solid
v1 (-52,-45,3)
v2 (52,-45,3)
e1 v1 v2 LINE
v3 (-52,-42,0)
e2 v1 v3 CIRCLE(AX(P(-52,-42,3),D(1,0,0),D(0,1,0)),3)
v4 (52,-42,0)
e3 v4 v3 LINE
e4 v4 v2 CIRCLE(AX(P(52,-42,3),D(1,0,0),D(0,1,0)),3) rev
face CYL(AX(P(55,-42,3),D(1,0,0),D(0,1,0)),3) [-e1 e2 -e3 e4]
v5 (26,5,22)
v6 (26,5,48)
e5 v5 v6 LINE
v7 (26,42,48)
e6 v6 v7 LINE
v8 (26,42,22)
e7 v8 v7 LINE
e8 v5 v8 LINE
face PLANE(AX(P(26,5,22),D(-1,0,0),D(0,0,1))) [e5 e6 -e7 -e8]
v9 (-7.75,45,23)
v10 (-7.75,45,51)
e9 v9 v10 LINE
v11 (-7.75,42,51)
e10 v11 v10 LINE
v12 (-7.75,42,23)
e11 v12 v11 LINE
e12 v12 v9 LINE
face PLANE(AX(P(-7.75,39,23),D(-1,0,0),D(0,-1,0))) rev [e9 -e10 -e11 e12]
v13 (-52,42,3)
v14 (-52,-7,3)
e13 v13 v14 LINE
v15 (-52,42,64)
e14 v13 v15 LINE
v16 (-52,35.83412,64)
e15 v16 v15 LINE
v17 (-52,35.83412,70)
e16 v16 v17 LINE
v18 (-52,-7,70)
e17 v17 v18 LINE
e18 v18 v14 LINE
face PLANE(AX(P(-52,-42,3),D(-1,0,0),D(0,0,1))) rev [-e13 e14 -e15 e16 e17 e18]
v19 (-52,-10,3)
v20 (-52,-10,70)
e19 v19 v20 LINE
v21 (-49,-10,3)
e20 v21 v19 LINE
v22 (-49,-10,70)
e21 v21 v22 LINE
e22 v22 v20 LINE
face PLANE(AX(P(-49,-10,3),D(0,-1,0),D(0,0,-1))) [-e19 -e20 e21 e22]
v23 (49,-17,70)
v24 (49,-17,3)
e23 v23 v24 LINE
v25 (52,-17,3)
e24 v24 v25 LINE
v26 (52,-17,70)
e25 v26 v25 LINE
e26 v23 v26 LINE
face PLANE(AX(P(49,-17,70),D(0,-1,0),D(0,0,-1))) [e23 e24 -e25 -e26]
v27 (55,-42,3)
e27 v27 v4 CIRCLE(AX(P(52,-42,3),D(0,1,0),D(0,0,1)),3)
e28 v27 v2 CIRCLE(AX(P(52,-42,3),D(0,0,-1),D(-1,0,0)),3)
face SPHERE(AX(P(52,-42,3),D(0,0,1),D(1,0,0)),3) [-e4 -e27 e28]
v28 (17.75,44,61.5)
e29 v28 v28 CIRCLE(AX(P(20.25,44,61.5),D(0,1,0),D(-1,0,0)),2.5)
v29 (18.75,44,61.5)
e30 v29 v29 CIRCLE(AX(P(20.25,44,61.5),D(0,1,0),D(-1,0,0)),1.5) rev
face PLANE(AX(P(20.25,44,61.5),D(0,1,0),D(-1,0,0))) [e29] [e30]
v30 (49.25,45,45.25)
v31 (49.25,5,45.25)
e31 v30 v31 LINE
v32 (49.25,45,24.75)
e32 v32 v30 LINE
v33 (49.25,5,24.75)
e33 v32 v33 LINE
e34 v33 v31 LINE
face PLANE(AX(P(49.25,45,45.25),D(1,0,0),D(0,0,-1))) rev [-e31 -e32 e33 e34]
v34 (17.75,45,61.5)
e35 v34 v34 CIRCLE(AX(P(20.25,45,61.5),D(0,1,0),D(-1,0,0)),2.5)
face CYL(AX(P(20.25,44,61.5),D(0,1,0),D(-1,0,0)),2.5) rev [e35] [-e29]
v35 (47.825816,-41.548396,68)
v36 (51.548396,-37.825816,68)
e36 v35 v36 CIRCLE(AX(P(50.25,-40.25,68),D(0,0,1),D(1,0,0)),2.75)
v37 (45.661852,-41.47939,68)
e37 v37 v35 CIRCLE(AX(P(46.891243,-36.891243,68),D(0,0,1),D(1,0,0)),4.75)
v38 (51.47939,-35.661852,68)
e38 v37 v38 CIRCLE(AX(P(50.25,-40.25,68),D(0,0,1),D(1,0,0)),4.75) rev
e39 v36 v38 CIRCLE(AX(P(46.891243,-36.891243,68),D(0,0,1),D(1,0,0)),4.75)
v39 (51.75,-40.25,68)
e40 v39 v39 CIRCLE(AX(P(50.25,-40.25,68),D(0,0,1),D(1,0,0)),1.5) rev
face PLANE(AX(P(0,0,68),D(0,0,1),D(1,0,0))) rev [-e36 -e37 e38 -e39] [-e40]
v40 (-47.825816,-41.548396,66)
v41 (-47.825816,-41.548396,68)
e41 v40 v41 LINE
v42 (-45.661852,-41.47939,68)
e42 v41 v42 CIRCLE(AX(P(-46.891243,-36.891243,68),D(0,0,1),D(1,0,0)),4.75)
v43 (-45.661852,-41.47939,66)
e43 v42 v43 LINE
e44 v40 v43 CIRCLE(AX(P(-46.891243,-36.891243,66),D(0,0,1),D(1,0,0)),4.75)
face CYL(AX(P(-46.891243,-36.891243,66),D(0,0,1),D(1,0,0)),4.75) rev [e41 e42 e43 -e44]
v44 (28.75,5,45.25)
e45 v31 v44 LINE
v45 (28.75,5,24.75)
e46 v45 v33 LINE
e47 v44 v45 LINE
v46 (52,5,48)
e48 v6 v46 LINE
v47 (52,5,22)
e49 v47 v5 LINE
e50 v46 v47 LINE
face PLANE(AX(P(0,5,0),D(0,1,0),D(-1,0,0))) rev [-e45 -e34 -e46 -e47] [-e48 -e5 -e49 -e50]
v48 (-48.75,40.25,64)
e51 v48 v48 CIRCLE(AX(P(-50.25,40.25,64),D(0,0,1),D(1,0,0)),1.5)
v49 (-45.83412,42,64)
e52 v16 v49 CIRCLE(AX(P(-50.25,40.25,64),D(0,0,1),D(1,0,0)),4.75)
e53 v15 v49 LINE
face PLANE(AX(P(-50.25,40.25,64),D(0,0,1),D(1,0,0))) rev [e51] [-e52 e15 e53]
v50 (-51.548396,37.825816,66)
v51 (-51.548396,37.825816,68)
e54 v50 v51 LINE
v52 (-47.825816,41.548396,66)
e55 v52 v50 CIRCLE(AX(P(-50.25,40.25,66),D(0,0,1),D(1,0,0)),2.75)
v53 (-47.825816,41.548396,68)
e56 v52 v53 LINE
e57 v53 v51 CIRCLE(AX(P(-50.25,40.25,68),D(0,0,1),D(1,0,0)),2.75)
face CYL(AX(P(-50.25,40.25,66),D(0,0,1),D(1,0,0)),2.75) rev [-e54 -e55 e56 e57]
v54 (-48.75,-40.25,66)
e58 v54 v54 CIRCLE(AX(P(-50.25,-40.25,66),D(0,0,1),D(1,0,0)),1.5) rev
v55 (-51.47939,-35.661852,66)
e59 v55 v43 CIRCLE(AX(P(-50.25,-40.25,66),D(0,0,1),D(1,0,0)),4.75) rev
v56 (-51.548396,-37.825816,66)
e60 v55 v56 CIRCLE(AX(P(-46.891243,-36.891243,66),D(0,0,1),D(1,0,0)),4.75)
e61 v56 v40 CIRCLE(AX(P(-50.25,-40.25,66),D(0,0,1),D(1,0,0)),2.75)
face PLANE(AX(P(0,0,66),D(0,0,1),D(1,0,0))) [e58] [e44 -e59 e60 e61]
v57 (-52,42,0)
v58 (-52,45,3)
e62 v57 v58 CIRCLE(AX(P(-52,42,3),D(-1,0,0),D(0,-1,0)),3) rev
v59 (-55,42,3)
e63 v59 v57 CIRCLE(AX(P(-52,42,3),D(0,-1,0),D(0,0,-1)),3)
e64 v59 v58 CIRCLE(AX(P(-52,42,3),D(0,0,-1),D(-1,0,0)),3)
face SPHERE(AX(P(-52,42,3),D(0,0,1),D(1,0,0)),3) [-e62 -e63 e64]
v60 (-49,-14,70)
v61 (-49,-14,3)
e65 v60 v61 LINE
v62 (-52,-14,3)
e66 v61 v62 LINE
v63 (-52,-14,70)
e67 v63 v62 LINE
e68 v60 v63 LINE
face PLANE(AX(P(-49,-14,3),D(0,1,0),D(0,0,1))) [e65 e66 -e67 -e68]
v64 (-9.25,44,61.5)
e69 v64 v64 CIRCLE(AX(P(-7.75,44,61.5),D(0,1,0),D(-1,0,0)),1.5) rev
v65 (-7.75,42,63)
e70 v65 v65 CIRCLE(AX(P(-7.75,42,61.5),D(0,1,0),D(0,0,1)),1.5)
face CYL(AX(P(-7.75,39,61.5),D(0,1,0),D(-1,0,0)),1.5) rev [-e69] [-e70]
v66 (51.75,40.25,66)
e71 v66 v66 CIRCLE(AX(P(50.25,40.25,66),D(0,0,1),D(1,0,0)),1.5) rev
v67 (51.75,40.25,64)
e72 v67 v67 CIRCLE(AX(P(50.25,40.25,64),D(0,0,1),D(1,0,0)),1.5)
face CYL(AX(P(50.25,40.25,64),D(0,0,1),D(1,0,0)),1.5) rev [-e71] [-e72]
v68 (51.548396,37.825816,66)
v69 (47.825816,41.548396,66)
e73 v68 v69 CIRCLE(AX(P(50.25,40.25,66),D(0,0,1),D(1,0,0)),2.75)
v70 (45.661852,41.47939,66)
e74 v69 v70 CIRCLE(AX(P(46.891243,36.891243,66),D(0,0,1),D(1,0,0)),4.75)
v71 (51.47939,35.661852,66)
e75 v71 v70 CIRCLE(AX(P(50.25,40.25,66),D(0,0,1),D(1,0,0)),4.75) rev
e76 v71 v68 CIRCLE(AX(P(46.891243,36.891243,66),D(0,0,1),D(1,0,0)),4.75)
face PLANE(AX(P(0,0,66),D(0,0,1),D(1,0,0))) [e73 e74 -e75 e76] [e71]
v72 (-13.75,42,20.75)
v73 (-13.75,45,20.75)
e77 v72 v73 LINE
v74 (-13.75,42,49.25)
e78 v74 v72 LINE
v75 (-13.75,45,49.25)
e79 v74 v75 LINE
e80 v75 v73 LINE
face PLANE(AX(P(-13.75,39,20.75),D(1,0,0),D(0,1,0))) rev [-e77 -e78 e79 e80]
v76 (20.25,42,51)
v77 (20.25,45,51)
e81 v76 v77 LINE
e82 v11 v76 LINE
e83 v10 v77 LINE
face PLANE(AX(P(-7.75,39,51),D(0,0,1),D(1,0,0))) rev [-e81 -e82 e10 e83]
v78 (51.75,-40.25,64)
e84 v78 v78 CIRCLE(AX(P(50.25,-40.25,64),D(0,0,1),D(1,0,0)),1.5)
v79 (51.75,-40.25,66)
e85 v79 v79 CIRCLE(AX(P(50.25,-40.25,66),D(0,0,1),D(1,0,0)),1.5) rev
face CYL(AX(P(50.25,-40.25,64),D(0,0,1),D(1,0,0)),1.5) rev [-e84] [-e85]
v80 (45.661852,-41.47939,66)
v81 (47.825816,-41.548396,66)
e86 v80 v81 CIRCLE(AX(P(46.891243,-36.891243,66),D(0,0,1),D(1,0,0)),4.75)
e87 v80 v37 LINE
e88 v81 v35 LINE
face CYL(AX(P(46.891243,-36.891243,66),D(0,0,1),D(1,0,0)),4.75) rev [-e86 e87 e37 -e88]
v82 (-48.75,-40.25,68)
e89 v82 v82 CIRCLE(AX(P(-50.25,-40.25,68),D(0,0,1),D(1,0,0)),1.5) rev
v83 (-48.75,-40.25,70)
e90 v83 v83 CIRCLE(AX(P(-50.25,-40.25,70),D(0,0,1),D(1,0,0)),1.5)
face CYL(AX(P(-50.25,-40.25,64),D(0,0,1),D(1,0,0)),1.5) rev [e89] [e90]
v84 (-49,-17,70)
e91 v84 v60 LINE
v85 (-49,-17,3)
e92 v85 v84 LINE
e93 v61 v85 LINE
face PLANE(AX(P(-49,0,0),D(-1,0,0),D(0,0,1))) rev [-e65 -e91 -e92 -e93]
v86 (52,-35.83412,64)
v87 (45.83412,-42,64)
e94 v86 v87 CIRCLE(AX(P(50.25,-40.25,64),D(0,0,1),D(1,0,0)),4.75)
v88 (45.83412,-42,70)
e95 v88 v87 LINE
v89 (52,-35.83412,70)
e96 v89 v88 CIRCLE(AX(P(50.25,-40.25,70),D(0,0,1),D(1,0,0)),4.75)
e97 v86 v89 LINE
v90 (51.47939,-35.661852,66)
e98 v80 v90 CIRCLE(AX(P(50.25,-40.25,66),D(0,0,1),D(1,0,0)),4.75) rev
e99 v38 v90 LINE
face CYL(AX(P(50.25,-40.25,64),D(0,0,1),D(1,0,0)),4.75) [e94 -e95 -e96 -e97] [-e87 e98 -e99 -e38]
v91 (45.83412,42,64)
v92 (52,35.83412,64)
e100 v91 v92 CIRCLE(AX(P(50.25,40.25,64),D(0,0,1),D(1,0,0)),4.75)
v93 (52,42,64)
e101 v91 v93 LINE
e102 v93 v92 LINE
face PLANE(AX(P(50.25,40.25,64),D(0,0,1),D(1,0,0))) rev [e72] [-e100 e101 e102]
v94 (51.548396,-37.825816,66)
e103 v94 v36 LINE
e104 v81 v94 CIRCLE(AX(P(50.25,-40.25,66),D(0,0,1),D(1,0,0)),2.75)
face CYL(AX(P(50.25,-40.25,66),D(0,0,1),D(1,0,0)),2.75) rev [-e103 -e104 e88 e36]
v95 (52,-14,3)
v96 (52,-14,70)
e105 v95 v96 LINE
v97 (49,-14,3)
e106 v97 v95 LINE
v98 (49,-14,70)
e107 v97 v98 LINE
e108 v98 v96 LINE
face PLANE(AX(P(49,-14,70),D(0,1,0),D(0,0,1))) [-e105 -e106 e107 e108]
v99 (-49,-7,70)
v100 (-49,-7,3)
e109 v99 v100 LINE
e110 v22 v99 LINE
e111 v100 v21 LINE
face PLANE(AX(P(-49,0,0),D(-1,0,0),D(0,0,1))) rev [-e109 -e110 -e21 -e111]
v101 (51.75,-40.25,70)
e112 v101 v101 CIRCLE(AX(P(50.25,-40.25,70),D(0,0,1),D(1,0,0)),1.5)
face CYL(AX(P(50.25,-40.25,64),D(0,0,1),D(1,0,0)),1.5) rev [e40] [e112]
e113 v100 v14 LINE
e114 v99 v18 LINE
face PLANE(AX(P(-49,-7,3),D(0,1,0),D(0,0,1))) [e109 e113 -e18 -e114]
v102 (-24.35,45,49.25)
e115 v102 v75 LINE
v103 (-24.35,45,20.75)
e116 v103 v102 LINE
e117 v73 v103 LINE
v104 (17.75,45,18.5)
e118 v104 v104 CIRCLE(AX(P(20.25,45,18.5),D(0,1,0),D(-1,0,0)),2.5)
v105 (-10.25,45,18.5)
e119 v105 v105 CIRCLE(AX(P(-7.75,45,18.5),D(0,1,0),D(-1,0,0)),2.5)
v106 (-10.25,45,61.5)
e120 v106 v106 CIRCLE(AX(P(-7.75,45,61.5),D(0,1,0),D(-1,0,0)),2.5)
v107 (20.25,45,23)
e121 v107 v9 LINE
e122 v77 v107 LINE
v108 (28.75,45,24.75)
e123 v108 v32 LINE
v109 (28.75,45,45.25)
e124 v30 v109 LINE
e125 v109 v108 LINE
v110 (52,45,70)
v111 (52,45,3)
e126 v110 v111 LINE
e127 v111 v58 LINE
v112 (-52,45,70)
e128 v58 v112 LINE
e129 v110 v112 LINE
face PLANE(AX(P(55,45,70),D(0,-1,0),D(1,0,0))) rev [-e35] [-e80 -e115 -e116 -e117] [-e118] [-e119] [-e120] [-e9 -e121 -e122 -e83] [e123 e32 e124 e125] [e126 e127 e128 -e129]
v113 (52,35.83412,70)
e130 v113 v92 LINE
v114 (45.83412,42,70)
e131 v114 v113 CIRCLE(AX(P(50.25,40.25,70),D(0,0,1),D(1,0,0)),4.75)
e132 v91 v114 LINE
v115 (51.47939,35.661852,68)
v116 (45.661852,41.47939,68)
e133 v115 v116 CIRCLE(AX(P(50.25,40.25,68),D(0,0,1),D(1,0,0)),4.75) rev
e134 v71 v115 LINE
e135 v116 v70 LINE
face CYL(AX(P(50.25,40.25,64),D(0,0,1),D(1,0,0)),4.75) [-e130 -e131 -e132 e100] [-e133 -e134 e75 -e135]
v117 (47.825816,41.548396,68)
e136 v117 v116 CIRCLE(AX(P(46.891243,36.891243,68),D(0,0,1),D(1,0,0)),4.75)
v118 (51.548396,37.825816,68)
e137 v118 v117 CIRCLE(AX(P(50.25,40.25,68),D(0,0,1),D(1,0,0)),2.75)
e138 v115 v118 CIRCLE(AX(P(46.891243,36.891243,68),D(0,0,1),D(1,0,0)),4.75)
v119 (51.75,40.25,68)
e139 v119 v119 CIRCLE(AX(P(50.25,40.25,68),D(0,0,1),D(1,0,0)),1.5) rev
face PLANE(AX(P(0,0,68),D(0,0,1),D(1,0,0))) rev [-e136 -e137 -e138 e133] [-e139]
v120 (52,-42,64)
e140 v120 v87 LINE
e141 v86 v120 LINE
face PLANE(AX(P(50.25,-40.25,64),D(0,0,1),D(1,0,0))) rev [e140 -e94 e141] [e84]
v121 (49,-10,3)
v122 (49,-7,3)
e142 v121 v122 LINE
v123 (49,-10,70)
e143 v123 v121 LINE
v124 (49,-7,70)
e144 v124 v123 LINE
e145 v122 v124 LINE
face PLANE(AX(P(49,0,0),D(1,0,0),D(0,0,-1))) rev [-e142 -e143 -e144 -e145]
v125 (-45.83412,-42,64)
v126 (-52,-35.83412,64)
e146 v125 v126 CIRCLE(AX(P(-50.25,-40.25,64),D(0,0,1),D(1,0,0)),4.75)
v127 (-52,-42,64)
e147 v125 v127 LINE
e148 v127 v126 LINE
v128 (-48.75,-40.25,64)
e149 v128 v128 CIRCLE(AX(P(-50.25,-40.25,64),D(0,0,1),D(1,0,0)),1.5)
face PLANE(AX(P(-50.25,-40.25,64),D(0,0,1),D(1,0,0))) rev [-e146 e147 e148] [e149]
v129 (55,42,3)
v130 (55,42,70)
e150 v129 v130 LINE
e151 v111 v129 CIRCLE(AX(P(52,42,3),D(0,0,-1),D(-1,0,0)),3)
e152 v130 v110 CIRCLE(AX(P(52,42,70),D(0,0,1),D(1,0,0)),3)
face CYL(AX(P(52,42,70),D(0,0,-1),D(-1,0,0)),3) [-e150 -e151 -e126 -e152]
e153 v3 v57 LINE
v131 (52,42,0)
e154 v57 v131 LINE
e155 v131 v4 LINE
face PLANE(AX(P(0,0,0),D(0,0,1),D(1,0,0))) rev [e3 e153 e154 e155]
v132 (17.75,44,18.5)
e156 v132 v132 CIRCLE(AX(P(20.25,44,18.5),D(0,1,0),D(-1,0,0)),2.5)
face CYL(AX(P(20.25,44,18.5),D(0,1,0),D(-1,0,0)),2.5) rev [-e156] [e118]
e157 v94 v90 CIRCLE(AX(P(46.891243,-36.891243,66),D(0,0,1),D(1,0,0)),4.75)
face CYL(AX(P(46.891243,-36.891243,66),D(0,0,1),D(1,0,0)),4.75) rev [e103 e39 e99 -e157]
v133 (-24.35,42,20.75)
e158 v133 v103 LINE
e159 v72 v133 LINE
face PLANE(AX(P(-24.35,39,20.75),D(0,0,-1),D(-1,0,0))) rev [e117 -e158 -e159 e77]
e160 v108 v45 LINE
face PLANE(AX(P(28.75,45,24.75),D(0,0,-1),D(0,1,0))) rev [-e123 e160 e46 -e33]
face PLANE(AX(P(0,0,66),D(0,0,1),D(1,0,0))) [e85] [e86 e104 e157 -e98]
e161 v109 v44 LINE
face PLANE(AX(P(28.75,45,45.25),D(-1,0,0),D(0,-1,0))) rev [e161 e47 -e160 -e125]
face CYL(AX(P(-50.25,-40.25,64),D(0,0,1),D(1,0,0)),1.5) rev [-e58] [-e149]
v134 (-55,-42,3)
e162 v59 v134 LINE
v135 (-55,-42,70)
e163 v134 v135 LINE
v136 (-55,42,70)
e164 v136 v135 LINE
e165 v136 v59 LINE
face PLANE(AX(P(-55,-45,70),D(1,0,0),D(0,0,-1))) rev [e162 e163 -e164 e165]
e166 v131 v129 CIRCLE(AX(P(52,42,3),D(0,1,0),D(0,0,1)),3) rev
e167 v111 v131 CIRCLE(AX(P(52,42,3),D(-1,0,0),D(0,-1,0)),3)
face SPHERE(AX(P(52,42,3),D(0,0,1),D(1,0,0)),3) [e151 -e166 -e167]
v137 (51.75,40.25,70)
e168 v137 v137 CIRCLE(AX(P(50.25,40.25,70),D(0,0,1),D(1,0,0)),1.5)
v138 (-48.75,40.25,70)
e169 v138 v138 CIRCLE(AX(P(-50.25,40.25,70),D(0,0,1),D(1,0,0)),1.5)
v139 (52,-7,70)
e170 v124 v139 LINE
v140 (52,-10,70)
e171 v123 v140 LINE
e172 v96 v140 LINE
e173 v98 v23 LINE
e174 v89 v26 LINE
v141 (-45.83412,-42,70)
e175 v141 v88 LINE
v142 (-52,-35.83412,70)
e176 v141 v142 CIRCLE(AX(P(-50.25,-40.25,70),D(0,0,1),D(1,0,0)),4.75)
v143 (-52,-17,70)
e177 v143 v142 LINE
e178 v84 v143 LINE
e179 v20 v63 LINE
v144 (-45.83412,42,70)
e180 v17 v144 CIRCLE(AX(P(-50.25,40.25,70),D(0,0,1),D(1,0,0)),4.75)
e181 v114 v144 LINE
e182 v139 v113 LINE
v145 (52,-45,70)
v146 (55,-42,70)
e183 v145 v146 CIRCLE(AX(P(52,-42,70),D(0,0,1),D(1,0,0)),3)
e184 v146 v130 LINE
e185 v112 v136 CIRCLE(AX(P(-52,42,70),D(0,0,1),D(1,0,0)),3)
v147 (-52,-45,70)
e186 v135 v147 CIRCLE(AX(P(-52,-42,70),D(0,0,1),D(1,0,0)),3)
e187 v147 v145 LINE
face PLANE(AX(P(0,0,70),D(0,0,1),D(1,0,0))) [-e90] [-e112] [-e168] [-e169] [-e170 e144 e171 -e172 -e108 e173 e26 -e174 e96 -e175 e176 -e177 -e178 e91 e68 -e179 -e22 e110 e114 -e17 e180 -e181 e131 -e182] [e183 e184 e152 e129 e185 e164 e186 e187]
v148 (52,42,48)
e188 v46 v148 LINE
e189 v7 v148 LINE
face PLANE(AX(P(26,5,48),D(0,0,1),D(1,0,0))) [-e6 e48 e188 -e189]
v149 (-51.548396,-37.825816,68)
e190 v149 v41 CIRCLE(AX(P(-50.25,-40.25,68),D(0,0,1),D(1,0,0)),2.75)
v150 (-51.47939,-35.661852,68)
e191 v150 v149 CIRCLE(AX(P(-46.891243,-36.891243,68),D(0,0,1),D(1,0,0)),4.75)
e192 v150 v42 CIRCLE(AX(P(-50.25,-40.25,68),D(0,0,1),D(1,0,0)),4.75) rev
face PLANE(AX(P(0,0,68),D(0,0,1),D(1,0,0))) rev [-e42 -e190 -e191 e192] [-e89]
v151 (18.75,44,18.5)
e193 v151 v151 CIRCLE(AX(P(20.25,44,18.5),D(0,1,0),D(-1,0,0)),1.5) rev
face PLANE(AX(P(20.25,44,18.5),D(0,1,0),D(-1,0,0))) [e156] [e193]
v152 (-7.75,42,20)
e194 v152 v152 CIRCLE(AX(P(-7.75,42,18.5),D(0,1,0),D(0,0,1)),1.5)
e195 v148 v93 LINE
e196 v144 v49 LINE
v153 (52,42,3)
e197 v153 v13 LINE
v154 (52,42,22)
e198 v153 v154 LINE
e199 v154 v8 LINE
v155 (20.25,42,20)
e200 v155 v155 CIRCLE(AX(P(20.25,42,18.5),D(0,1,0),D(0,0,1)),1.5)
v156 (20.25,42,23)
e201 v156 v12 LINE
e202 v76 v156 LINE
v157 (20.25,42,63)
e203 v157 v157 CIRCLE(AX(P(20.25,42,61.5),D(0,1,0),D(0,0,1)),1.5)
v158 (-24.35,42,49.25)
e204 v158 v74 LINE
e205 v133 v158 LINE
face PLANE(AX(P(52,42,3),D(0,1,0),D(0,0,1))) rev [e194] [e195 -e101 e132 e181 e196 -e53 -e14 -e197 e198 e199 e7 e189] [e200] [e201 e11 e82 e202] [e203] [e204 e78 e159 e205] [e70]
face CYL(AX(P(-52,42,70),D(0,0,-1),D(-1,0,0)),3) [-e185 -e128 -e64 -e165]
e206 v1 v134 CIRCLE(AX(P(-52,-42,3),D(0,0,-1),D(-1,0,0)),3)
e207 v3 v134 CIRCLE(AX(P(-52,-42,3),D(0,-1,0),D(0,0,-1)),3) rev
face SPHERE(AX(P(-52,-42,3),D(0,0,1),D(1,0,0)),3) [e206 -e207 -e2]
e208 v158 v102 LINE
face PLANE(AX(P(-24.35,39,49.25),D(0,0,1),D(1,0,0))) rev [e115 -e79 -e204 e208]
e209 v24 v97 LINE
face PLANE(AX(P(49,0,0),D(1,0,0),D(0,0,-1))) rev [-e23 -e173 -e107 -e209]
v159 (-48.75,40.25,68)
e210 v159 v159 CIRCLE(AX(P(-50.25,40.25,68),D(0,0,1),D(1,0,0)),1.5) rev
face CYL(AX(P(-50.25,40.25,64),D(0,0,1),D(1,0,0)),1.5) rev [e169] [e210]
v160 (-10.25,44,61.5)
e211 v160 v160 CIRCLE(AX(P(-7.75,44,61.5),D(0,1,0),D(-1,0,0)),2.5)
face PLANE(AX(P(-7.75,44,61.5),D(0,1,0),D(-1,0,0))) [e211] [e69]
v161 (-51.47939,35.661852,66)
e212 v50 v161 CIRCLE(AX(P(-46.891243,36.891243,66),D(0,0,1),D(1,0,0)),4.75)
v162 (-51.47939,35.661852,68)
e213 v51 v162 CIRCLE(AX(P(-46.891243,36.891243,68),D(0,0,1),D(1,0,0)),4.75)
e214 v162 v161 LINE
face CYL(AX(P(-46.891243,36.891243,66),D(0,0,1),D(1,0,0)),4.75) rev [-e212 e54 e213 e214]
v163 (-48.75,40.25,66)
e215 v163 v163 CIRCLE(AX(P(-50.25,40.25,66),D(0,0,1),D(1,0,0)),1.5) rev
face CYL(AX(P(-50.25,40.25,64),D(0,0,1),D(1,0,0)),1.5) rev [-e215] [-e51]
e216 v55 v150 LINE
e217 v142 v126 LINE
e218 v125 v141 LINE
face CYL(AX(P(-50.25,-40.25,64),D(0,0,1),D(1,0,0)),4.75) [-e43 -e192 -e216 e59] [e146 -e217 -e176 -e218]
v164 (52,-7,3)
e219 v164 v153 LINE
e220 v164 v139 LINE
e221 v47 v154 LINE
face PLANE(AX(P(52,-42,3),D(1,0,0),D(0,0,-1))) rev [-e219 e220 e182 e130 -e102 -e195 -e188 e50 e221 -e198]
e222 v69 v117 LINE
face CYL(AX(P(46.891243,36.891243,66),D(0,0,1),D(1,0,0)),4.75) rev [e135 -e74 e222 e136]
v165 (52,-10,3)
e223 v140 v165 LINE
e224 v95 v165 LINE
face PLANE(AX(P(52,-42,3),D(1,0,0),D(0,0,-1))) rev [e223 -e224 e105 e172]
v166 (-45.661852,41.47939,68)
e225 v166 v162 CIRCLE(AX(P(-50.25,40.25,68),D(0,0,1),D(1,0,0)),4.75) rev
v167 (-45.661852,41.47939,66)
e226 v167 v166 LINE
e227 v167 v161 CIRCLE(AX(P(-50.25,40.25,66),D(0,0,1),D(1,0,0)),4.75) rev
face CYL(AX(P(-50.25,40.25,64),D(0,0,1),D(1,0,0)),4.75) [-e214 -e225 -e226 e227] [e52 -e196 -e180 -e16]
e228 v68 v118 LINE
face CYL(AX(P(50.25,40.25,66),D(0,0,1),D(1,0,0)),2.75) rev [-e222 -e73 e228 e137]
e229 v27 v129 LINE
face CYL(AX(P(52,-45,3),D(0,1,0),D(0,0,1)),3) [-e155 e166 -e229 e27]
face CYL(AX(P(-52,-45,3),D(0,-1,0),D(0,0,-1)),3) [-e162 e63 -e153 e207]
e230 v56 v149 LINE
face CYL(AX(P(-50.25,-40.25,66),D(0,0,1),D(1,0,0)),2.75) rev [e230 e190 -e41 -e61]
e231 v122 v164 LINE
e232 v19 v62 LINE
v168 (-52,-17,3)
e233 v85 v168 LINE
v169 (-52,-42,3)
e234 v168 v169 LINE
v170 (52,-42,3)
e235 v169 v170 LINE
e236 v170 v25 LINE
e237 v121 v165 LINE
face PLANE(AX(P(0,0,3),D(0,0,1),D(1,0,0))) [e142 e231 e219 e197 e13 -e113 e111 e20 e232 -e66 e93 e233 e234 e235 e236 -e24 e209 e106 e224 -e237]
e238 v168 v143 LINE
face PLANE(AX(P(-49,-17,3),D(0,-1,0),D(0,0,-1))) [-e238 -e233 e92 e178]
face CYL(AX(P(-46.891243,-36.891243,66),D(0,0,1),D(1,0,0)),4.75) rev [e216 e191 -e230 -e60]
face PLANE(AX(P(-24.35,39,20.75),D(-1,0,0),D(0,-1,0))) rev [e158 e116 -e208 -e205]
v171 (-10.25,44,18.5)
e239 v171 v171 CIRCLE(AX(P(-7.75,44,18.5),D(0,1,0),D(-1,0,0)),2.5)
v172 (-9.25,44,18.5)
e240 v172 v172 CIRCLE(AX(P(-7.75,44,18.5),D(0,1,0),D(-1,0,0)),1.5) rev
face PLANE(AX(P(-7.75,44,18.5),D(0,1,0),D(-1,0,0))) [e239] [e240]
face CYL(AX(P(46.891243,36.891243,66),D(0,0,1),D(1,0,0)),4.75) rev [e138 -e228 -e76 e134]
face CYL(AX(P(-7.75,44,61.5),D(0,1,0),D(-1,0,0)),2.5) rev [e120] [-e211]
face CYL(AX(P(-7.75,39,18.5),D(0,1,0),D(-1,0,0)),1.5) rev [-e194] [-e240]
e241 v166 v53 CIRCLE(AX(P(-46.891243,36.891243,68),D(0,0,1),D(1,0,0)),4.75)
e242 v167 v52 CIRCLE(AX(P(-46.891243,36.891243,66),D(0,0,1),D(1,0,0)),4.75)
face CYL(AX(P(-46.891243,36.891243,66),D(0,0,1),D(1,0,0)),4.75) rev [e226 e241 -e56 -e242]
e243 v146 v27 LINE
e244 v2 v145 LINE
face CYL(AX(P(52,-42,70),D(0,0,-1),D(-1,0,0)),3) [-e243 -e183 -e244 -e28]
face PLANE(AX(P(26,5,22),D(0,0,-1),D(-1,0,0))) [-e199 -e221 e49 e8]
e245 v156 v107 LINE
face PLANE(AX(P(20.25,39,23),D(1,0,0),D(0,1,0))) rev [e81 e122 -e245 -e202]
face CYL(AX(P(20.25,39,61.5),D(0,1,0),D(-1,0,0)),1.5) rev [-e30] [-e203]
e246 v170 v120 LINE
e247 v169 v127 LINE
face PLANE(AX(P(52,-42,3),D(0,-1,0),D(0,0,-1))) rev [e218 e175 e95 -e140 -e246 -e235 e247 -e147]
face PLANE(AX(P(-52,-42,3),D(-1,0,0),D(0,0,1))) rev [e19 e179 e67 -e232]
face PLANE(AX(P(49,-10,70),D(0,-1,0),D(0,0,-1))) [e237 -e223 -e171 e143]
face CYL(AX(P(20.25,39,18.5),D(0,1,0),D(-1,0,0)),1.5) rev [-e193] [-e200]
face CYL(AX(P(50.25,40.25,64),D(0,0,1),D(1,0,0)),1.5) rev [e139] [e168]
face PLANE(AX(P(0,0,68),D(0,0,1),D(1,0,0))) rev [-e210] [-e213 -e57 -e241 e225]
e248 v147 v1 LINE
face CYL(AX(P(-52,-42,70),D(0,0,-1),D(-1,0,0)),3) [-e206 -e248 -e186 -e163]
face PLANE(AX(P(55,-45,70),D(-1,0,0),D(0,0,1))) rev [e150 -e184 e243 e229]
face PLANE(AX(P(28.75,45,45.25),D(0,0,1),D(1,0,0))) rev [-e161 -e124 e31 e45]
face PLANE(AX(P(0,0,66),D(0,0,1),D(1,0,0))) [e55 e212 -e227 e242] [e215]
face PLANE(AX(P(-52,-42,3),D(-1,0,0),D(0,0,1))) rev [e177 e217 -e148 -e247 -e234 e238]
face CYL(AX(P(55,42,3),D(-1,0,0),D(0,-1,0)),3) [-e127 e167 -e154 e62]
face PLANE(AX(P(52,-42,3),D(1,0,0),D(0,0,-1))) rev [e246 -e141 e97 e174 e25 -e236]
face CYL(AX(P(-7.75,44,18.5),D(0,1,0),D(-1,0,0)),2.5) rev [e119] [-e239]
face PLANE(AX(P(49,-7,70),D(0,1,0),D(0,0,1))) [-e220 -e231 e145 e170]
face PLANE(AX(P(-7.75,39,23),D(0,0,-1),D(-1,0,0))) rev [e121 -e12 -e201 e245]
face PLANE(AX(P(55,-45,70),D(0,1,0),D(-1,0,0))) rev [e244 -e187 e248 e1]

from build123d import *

# Parameters (mm, degrees)
SKETCH2_W           = 110
SKETCH2_H           = 90
BOSS_EXTRUDE1_DEPTH = 70
SKETCH4_W           = 104
SKETCH4_H           = 84
CUT_EXTRUDE1_DEPTH  = 67
FILLET6_R           = 3
FILLET7_R           = 3
FILLET8_R           = 3
FILLET9_R           = 3
FILLET10_R          = 3
SKETCH5_W           = 26
SKETCH5_H           = 26
BOSS_EXTRUDE2_DEPTH = 40
SKETCH7_W           = 20.5
SKETCH7_H           = 20.5
CUT_EXTRUDE2_DEPTH  = 40
SKETCH9_W           = 67
SKETCH9_H           = 3
BOSS_EXTRUDE3_DEPTH = 6
SKETCH10_W          = 67
SKETCH10_H          = 3
BOSS_EXTRUDE4_DEPTH = 6
SKETCH12_R          = 1.5
SKETCH12_W          = 28
SKETCH12_H          = 28
CUT_EXTRUDE4_DEPTH  = 6
SKETCH13_W          = 10.6
SKETCH13_H          = 28.5
CUT_EXTRUDE5_DEPTH  = 6
SKETCH14_R          = 4.75
SKETCH14_R_2        = 1.5
BOSS_EXTRUDE7_DEPTH = 6
CUT_EXTRUDE6_START  = -2
SKETCH16_R          = 4.75
SKETCH16_R_2        = 2.75
SKETCH16_R_3        = 1.5
CUT_EXTRUDE6_DEPTH  = 2
SKETCH17_R          = 2.5
CUT_EXTRUDE11_DEPTH = 1


with BuildPart() as part:
    # Sketch2 → Boss-Extrude1 (new body)
    with BuildSketch(Plane.XY):
        Rectangle(SKETCH2_W, SKETCH2_H)
    extrude(amount=BOSS_EXTRUDE1_DEPTH)

    # Sketch4 → Cut-Extrude1 (cut)
    with BuildSketch(Plane.XY.offset(70)):
        Rectangle(SKETCH4_W, SKETCH4_H)
    extrude(amount=-CUT_EXTRUDE1_DEPTH, mode=Mode.SUBTRACT)

    # Fillet6
    fillet6_edges = [part.edges().sort_by_distance(p)[0] for p in [
        (0, 45, 0),
        (55, 0, 0),
        (0, -45, 0),
        (-55, 0, 0),
    ]]
    fillet(fillet6_edges, radius=FILLET6_R)

    # Fillet7
    # the kernel refuses this fillet: 3 mm, written as the material it takes off along each edge
    with BuildSketch(Plane(origin=(52, 42, 3), x_dir=(0, 1, 0), z_dir=(1, 0, 0))) as fillet7_piece_1_section:
        Polygon((0, 0), (FILLET7_R, 0), (FILLET7_R, -FILLET7_R), (0, -FILLET7_R), align=None)
    fillet7_piece_1 = extrude(amount=FILLET7_R, mode=Mode.PRIVATE)
    fillet7_piece_1 = fillet7_piece_1 - Plane(origin=(52, 42, 3), x_dir=(0, -0.7071067811865475, 0.7071067811865475), z_dir=(1, 0, 0)) * Sphere(FILLET7_R, mode=Mode.PRIVATE)
    add(fillet7_piece_1, mode=Mode.SUBTRACT)
    with BuildSketch(Plane(origin=(55, 45, 3), x_dir=(0, -1, 0), z_dir=(0, 0, 1))) as fillet7_piece_2:
        with BuildLine():
            CenterArc((FILLET7_R, -FILLET7_R), FILLET7_R, 90, 90)
            Line((0, -FILLET7_R), (0, 0))
            Line((0, 0), (FILLET7_R, 0))
        make_face()
    extrude(amount=74.5, mode=Mode.SUBTRACT)

    # Fillet8
    # the kernel refuses this fillet: 3 mm, written as the material it takes off along each edge
    with BuildSketch(Plane(origin=(52, -42, 3), x_dir=(1, 0, 0), z_dir=(0, -1, 0))) as fillet8_piece_1_section:
        Polygon((0, 0), (FILLET8_R, 0), (FILLET8_R, -FILLET8_R), (0, -FILLET8_R), align=None)
    fillet8_piece_1 = extrude(amount=FILLET8_R, mode=Mode.PRIVATE)
    fillet8_piece_1 = fillet8_piece_1 - Plane(origin=(52, -42, 3), x_dir=(-0.7071067811865475, 0, 0.7071067811865475), z_dir=(0, -1, 0)) * Sphere(FILLET8_R, mode=Mode.PRIVATE)
    add(fillet8_piece_1, mode=Mode.SUBTRACT)
    with BuildSketch(Plane(origin=(55, -45, 3), x_dir=(-1, 0, 0), z_dir=(0, 0, 1))) as fillet8_piece_2:
        with BuildLine():
            CenterArc((FILLET8_R, -FILLET8_R), FILLET8_R, 90, 90)
            Line((0, -FILLET8_R), (0, 0))
            Line((0, 0), (FILLET8_R, 0))
        make_face()
    extrude(amount=74.5, mode=Mode.SUBTRACT)

    # Fillet9
    # the kernel refuses this fillet: 3 mm, written as the material it takes off along each edge
    with BuildSketch(Plane(origin=(-52, -42, 3), x_dir=(-1, 0, 0), z_dir=(0, -1, 0))) as fillet9_piece_1_section:
        Polygon((0, 0), (FILLET9_R, 0), (FILLET9_R, FILLET9_R), (0, FILLET9_R), align=None)
    fillet9_piece_1 = extrude(amount=FILLET9_R, mode=Mode.PRIVATE)
    fillet9_piece_1 = fillet9_piece_1 - Plane(origin=(-52, -42, 3), x_dir=(0.7071067811865475, 0, 0.7071067811865475), z_dir=(0, -1, 0)) * Sphere(FILLET9_R, mode=Mode.PRIVATE)
    add(fillet9_piece_1, mode=Mode.SUBTRACT)
    with BuildSketch(Plane(origin=(-55, -45, 3), x_dir=(1, 0, 0), z_dir=(0, 0, 1))) as fillet9_piece_2:
        with BuildLine():
            CenterArc((FILLET9_R, FILLET9_R), FILLET9_R, 180, 90)
            Line((0, FILLET9_R), (0, 0))
            Line((0, 0), (FILLET9_R, 0))
        make_face()
    extrude(amount=74.5, mode=Mode.SUBTRACT)

    # Fillet10
    # the kernel refuses this fillet: 3 mm, written as the material it takes off along each edge
    with BuildSketch(Plane(origin=(-52, 42, 3), x_dir=(0, 1, 0), z_dir=(-1, 0, 0))) as fillet10_piece_1_section:
        Polygon((0, 0), (FILLET10_R, 0), (FILLET10_R, FILLET10_R), (0, FILLET10_R), align=None)
    fillet10_piece_1 = extrude(amount=FILLET10_R, mode=Mode.PRIVATE)
    fillet10_piece_1 = fillet10_piece_1 - Plane(origin=(-52, 42, 3), x_dir=(0, -0.7071067811865475, 0.7071067811865475), z_dir=(-1, 0, 0)) * Sphere(FILLET10_R, mode=Mode.PRIVATE)
    add(fillet10_piece_1, mode=Mode.SUBTRACT)
    with BuildSketch(Plane(origin=(-55, 45, 3), x_dir=(0, -1, 0), z_dir=(0, 0, 1))) as fillet10_piece_2:
        with BuildLine():
            CenterArc((FILLET10_R, FILLET10_R), FILLET10_R, 180, 90)
            Line((0, FILLET10_R), (0, 0))
            Line((0, 0), (FILLET10_R, 0))
        make_face()
    extrude(amount=74.5, mode=Mode.SUBTRACT)

    # Sketch5 → Boss-Extrude2 (add)
    with BuildSketch(Plane(origin=(0, 45, 0), x_dir=(1, 0, 0), z_dir=(0, 1, 0))):
        with Locations((39, -35)):
            Rectangle(SKETCH5_W, SKETCH5_H)
    extrude(amount=-BOSS_EXTRUDE2_DEPTH)

    # Sketch7 → Cut-Extrude2 (cut)
    with BuildSketch(Plane.XZ.offset(-5)):
        with Locations((39, 35)):
            Rectangle(SKETCH7_W, SKETCH7_H)
    extrude(amount=-CUT_EXTRUDE2_DEPTH, mode=Mode.SUBTRACT)

    # Sketch9 → Boss-Extrude3 (add)
    with BuildSketch(Plane.ZY.offset(55)):
        with Locations((36.5, -15.5)):
            Rectangle(SKETCH9_W, SKETCH9_H)
        with Locations((36.5, -8.5)):
            Rectangle(SKETCH9_W, SKETCH9_H)
    extrude(amount=-BOSS_EXTRUDE3_DEPTH)

    # Sketch10 → Boss-Extrude4 (add)
    with BuildSketch(Plane(origin=(55, 0, 0), x_dir=(0, 0, -1), z_dir=(1, 0, 0))):
        with Locations((-36.5, -15.5)):
            Rectangle(SKETCH10_W, SKETCH10_H)
        with Locations((-36.5, -8.5)):
            Rectangle(SKETCH10_W, SKETCH10_H)
    extrude(amount=-BOSS_EXTRUDE4_DEPTH)

    # Sketch12 → Cut-Extrude4 (cut)
    with BuildSketch(Plane(origin=(0, 45, 0), x_dir=(1, 0, 0), z_dir=(0, 1, 0))):
        with Locations(Location((-7.75, -18.5, 0), (0, 0, 180))):
            Circle(SKETCH12_R)
        with Locations(Location((20.25, -18.5, 0), (0, 0, 180))):
            Circle(SKETCH12_R)
        with Locations(Location((-7.75, -61.5, 0), (0, 0, 180))):
            Circle(SKETCH12_R)
        with Locations(Location((20.25, -61.5, 0), (0, 0, 180))):
            Circle(SKETCH12_R)
        with Locations((6.25, -37)):
            Rectangle(SKETCH12_W, SKETCH12_H)
    extrude(amount=-CUT_EXTRUDE4_DEPTH, mode=Mode.SUBTRACT)

    # Sketch13 → Cut-Extrude5 (cut)
    with BuildSketch(Plane(origin=(0, 45, 0), x_dir=(1, 0, 0), z_dir=(0, 1, 0))):
        with Locations((-19.05, -35)):
            Rectangle(SKETCH13_W, SKETCH13_H)
    extrude(amount=-CUT_EXTRUDE5_DEPTH, mode=Mode.SUBTRACT)

    # Sketch14 → Boss-Extrude7 (add)
    # profile 1 of 4: a face of its own
    with BuildSketch(Plane.XY.offset(70)):
        with Locations((-50.25, 40.25)):
            Circle(SKETCH14_R)
        with Locations((-50.25, 40.25)):
            Circle(SKETCH14_R_2, mode=Mode.SUBTRACT)
    # profile 2 of 4: a face of its own
    with BuildSketch(Plane.XY.offset(70)):
        with Locations((50.25, 40.25)):
            Circle(SKETCH14_R)
        with Locations((50.25, 40.25)):
            Circle(SKETCH14_R_2, mode=Mode.SUBTRACT)
    # profile 3 of 4: a face of its own
    with BuildSketch(Plane.XY.offset(70)):
        with Locations((-50.25, -40.25)):
            Circle(SKETCH14_R)
        with Locations((-50.25, -40.25)):
            Circle(SKETCH14_R_2, mode=Mode.SUBTRACT)
    # profile 4 of 4: a face of its own
    with BuildSketch(Plane.XY.offset(70)):
        with Locations((50.25, -40.25)):
            Circle(SKETCH14_R)
        with Locations((50.25, -40.25)):
            Circle(SKETCH14_R_2, mode=Mode.SUBTRACT)
    extrude(amount=-BOSS_EXTRUDE7_DEPTH)

    # Sketch16 → Cut-Extrude6 (cut)
    # profile 1 of 24: a face of its own
    with BuildSketch(Plane.XY.offset(70).offset(CUT_EXTRUDE6_START)):
        with Locations((-46.891242789, -36.891242789)):
            Circle(SKETCH16_R)
    # profile 2 of 24: a face of its own
    with BuildSketch(Plane.XY.offset(70).offset(CUT_EXTRUDE6_START)):
        with Locations((-50.25, -40.25)):
            Circle(SKETCH16_R_2)
        with Locations((-50.25, -40.25)):
            Circle(SKETCH16_R_3, mode=Mode.SUBTRACT)
    # profile 3 of 24: a face of its own
    with BuildSketch(Plane.XY.offset(70).offset(CUT_EXTRUDE6_START)):
        with BuildLine():
            ThreePointArc((-42.141242789, -36.891242789), (-46.271243376, -32.181879698), (-51.479390464, -35.661852325))
            ThreePointArc((-51.479390464, -35.661852325), (-46.891242789, -36.891242789), (-45.661852325, -41.479390464))
            ThreePointArc((-45.661852325, -41.479390464), (-43.122814423, -39.782859577), (-42.141242789, -36.891242789))
        make_face()
    # profile 4 of 24: a face of its own
    with BuildSketch(Plane.XY.offset(70).offset(CUT_EXTRUDE6_START)):
        with BuildLine():
            ThreePointArc((-51.548395689, -37.825815883), (-48.837216957, -37.890647531), (-47.5, -40.25))
            ThreePointArc((-47.5, -40.25), (-47.5826974, -40.91932566), (-47.825815883, -41.548395689))
            ThreePointArc((-47.825815883, -41.548395689), (-46.739850085, -41.638829571), (-45.661852325, -41.479390464))
            ThreePointArc((-45.661852325, -41.479390464), (-46.891242789, -36.891242789), (-51.479390464, -35.661852325))
            ThreePointArc((-51.479390464, -35.661852325), (-51.638829571, -36.739850085), (-51.548395689, -37.825815883))
        make_face()
    # profile 5 of 24: a face of its own
    with BuildSketch(Plane.XY.offset(70).offset(CUT_EXTRUDE6_START)):
        with Locations((-50.25, -40.25)):
            Circle(SKETCH16_R_2)
        with Locations((-50.25, -40.25)):
            Circle(SKETCH16_R_3, mode=Mode.SUBTRACT)
    # profile 6 of 24: a face of its own
    with BuildSketch(Plane.XY.offset(70).offset(CUT_EXTRUDE6_START)):
        with Locations((-46.891242789, -36.891242789)):
            Circle(SKETCH16_R)
    # profile 7 of 24: a face of its own
    with BuildSketch(Plane.XY.offset(70).offset(CUT_EXTRUDE6_START)):
        with Locations((46.891242789, -36.891242789)):
            Circle(SKETCH16_R)
    # profile 8 of 24: a face of its own
    with BuildSketch(Plane.XY.offset(70).offset(CUT_EXTRUDE6_START)):
        with Locations((50.25, -40.25)):
            Circle(SKETCH16_R_2)
        with Locations((50.25, -40.25)):
            Circle(SKETCH16_R_3, mode=Mode.SUBTRACT)
    # profile 9 of 24: a face of its own
    with BuildSketch(Plane.XY.offset(70).offset(CUT_EXTRUDE6_START)):
        with Locations((50.25, -40.25)):
            Circle(SKETCH16_R_2)
        with Locations((50.25, -40.25)):
            Circle(SKETCH16_R_3, mode=Mode.SUBTRACT)
    # profile 10 of 24: a face of its own
    with BuildSketch(Plane.XY.offset(70).offset(CUT_EXTRUDE6_START)):
        with Locations((46.891242789, -36.891242789)):
            Circle(SKETCH16_R)
    # profile 11 of 24: a face of its own
    with BuildSketch(Plane.XY.offset(70).offset(CUT_EXTRUDE6_START)):
        with BuildLine():
            ThreePointArc((47.825815883, -41.548395689), (48.305456352, -38.305456352), (51.548395689, -37.825815883))
            ThreePointArc((51.548395689, -37.825815883), (51.617974021, -37.360829696), (51.641242789, -36.891242789))
            ThreePointArc((51.641242789, -36.891242789), (51.600605881, -36.271243376), (51.479390464, -35.661852325))
            ThreePointArc((51.479390464, -35.661852325), (46.891242789, -36.891242789), (45.661852325, -41.479390464))
            ThreePointArc((45.661852325, -41.479390464), (46.739850085, -41.638829571), (47.825815883, -41.548395689))
        make_face()
    # profile 12 of 24: a face of its own
    with BuildSketch(Plane.XY.offset(70).offset(CUT_EXTRUDE6_START)):
        with BuildLine():
            ThreePointArc((51.479390464, -35.661852325), (43.532485579, -33.532485579), (45.661852325, -41.479390464))
            ThreePointArc((45.661852325, -41.479390464), (46.891242789, -36.891242789), (51.479390464, -35.661852325))
        make_face()
    # profile 13 of 24: a face of its own
    with BuildSketch(Plane.XY.offset(70).offset(CUT_EXTRUDE6_START)):
        with Locations((46.891242789, 36.891242789)):
            Circle(SKETCH16_R)
    # profile 14 of 24: a face of its own
    with BuildSketch(Plane.XY.offset(70).offset(CUT_EXTRUDE6_START)):
        with Locations((50.25, 40.25)):
            Circle(SKETCH16_R_2)
        with Locations((50.25, 40.25)):
            Circle(SKETCH16_R_3, mode=Mode.SUBTRACT)
    # profile 15 of 24: a face of its own
    with BuildSketch(Plane.XY.offset(70).offset(CUT_EXTRUDE6_START)):
        with Locations((50.25, 40.25)):
            Circle(SKETCH16_R_2)
        with Locations((50.25, 40.25)):
            Circle(SKETCH16_R_3, mode=Mode.SUBTRACT)
    # profile 16 of 24: a face of its own
    with BuildSketch(Plane.XY.offset(70).offset(CUT_EXTRUDE6_START)):
        with Locations((46.891242789, 36.891242789)):
            Circle(SKETCH16_R)
    # profile 17 of 24: a face of its own
    with BuildSketch(Plane.XY.offset(70).offset(CUT_EXTRUDE6_START)):
        with BuildLine():
            ThreePointArc((51.548395689, 37.825815883), (48.305456352, 38.305456352), (47.825815883, 41.548395689))
            ThreePointArc((47.825815883, 41.548395689), (46.739850085, 41.638829571), (45.661852325, 41.479390464))
            ThreePointArc((45.661852325, 41.479390464), (46.891242789, 36.891242789), (51.479390464, 35.661852325))
            ThreePointArc((51.479390464, 35.661852325), (51.600605881, 36.271243376), (51.641242789, 36.891242789))
            ThreePointArc((51.641242789, 36.891242789), (51.617974021, 37.360829696), (51.548395689, 37.825815883))
        make_face()
    # profile 18 of 24: a face of its own
    with BuildSketch(Plane.XY.offset(70).offset(CUT_EXTRUDE6_START)):
        with BuildLine():
            ThreePointArc((51.479390464, 35.661852325), (46.891242789, 36.891242789), (45.661852325, 41.479390464))
            ThreePointArc((45.661852325, 41.479390464), (43.532485579, 33.532485579), (51.479390464, 35.661852325))
        make_face()
    # profile 19 of 24: a face of its own
    with BuildSketch(Plane.XY.offset(70).offset(CUT_EXTRUDE6_START)):
        with BuildLine():
            ThreePointArc((-42.141242789, 36.891242789), (-43.122814423, 39.782859577), (-45.661852325, 41.479390464))
            ThreePointArc((-45.661852325, 41.479390464), (-46.891242789, 36.891242789), (-51.479390464, 35.661852325))
            ThreePointArc((-51.479390464, 35.661852325), (-46.271243376, 32.181879698), (-42.141242789, 36.891242789))
        make_face()
    # profile 20 of 24: a face of its own
    with BuildSketch(Plane.XY.offset(70).offset(CUT_EXTRUDE6_START)):
        with BuildLine():
            ThreePointArc((-47.825815883, 41.548395689), (-47.5826974, 40.91932566), (-47.5, 40.25))
            ThreePointArc((-47.5, 40.25), (-48.837216957, 37.890647531), (-51.548395689, 37.825815883))
            ThreePointArc((-51.548395689, 37.825815883), (-51.638829571, 36.739850085), (-51.479390464, 35.661852325))
            ThreePointArc((-51.479390464, 35.661852325), (-46.891242789, 36.891242789), (-45.661852325, 41.479390464))
            ThreePointArc((-45.661852325, 41.479390464), (-46.739850085, 41.638829571), (-47.825815883, 41.548395689))
        make_face()
    # profile 21 of 24: a face of its own
    with BuildSketch(Plane.XY.offset(70).offset(CUT_EXTRUDE6_START)):
        with Locations((-50.25, 40.25)):
            Circle(SKETCH16_R_2)
        with Locations((-50.25, 40.25)):
            Circle(SKETCH16_R_3, mode=Mode.SUBTRACT)
    # profile 22 of 24: a face of its own
    with BuildSketch(Plane.XY.offset(70).offset(CUT_EXTRUDE6_START)):
        with Locations((-46.891242789, 36.891242789)):
            Circle(SKETCH16_R)
    # profile 23 of 24: a face of its own
    with BuildSketch(Plane.XY.offset(70).offset(CUT_EXTRUDE6_START)):
        with Locations((-46.891242789, 36.891242789)):
            Circle(SKETCH16_R)
    # profile 24 of 24: a face of its own
    with BuildSketch(Plane.XY.offset(70).offset(CUT_EXTRUDE6_START)):
        with Locations((-50.25, 40.25)):
            Circle(SKETCH16_R_2)
        with Locations((-50.25, 40.25)):
            Circle(SKETCH16_R_3, mode=Mode.SUBTRACT)
    extrude(amount=-CUT_EXTRUDE6_DEPTH, mode=Mode.SUBTRACT)

    # Sketch17 → Cut-Extrude11 (cut)
    with BuildSketch(Plane(origin=(0, 45, 0), x_dir=(1, 0, 0), z_dir=(0, 1, 0))):
        with Locations(Location((-7.75, -18.5, 0), (0, 0, 180))):
            Circle(SKETCH17_R)
        with Locations(Location((20.25, -18.5, 0), (0, 0, 180))):
            Circle(SKETCH17_R)
        with Locations(Location((-7.75, -61.5, 0), (0, 0, 180))):
            Circle(SKETCH17_R)
        with Locations(Location((20.25, -61.5, 0), (0, 0, 180))):
            Circle(SKETCH17_R)
    extrude(amount=-CUT_EXTRUDE11_DEPTH, mode=Mode.SUBTRACT)


solid = part.part
